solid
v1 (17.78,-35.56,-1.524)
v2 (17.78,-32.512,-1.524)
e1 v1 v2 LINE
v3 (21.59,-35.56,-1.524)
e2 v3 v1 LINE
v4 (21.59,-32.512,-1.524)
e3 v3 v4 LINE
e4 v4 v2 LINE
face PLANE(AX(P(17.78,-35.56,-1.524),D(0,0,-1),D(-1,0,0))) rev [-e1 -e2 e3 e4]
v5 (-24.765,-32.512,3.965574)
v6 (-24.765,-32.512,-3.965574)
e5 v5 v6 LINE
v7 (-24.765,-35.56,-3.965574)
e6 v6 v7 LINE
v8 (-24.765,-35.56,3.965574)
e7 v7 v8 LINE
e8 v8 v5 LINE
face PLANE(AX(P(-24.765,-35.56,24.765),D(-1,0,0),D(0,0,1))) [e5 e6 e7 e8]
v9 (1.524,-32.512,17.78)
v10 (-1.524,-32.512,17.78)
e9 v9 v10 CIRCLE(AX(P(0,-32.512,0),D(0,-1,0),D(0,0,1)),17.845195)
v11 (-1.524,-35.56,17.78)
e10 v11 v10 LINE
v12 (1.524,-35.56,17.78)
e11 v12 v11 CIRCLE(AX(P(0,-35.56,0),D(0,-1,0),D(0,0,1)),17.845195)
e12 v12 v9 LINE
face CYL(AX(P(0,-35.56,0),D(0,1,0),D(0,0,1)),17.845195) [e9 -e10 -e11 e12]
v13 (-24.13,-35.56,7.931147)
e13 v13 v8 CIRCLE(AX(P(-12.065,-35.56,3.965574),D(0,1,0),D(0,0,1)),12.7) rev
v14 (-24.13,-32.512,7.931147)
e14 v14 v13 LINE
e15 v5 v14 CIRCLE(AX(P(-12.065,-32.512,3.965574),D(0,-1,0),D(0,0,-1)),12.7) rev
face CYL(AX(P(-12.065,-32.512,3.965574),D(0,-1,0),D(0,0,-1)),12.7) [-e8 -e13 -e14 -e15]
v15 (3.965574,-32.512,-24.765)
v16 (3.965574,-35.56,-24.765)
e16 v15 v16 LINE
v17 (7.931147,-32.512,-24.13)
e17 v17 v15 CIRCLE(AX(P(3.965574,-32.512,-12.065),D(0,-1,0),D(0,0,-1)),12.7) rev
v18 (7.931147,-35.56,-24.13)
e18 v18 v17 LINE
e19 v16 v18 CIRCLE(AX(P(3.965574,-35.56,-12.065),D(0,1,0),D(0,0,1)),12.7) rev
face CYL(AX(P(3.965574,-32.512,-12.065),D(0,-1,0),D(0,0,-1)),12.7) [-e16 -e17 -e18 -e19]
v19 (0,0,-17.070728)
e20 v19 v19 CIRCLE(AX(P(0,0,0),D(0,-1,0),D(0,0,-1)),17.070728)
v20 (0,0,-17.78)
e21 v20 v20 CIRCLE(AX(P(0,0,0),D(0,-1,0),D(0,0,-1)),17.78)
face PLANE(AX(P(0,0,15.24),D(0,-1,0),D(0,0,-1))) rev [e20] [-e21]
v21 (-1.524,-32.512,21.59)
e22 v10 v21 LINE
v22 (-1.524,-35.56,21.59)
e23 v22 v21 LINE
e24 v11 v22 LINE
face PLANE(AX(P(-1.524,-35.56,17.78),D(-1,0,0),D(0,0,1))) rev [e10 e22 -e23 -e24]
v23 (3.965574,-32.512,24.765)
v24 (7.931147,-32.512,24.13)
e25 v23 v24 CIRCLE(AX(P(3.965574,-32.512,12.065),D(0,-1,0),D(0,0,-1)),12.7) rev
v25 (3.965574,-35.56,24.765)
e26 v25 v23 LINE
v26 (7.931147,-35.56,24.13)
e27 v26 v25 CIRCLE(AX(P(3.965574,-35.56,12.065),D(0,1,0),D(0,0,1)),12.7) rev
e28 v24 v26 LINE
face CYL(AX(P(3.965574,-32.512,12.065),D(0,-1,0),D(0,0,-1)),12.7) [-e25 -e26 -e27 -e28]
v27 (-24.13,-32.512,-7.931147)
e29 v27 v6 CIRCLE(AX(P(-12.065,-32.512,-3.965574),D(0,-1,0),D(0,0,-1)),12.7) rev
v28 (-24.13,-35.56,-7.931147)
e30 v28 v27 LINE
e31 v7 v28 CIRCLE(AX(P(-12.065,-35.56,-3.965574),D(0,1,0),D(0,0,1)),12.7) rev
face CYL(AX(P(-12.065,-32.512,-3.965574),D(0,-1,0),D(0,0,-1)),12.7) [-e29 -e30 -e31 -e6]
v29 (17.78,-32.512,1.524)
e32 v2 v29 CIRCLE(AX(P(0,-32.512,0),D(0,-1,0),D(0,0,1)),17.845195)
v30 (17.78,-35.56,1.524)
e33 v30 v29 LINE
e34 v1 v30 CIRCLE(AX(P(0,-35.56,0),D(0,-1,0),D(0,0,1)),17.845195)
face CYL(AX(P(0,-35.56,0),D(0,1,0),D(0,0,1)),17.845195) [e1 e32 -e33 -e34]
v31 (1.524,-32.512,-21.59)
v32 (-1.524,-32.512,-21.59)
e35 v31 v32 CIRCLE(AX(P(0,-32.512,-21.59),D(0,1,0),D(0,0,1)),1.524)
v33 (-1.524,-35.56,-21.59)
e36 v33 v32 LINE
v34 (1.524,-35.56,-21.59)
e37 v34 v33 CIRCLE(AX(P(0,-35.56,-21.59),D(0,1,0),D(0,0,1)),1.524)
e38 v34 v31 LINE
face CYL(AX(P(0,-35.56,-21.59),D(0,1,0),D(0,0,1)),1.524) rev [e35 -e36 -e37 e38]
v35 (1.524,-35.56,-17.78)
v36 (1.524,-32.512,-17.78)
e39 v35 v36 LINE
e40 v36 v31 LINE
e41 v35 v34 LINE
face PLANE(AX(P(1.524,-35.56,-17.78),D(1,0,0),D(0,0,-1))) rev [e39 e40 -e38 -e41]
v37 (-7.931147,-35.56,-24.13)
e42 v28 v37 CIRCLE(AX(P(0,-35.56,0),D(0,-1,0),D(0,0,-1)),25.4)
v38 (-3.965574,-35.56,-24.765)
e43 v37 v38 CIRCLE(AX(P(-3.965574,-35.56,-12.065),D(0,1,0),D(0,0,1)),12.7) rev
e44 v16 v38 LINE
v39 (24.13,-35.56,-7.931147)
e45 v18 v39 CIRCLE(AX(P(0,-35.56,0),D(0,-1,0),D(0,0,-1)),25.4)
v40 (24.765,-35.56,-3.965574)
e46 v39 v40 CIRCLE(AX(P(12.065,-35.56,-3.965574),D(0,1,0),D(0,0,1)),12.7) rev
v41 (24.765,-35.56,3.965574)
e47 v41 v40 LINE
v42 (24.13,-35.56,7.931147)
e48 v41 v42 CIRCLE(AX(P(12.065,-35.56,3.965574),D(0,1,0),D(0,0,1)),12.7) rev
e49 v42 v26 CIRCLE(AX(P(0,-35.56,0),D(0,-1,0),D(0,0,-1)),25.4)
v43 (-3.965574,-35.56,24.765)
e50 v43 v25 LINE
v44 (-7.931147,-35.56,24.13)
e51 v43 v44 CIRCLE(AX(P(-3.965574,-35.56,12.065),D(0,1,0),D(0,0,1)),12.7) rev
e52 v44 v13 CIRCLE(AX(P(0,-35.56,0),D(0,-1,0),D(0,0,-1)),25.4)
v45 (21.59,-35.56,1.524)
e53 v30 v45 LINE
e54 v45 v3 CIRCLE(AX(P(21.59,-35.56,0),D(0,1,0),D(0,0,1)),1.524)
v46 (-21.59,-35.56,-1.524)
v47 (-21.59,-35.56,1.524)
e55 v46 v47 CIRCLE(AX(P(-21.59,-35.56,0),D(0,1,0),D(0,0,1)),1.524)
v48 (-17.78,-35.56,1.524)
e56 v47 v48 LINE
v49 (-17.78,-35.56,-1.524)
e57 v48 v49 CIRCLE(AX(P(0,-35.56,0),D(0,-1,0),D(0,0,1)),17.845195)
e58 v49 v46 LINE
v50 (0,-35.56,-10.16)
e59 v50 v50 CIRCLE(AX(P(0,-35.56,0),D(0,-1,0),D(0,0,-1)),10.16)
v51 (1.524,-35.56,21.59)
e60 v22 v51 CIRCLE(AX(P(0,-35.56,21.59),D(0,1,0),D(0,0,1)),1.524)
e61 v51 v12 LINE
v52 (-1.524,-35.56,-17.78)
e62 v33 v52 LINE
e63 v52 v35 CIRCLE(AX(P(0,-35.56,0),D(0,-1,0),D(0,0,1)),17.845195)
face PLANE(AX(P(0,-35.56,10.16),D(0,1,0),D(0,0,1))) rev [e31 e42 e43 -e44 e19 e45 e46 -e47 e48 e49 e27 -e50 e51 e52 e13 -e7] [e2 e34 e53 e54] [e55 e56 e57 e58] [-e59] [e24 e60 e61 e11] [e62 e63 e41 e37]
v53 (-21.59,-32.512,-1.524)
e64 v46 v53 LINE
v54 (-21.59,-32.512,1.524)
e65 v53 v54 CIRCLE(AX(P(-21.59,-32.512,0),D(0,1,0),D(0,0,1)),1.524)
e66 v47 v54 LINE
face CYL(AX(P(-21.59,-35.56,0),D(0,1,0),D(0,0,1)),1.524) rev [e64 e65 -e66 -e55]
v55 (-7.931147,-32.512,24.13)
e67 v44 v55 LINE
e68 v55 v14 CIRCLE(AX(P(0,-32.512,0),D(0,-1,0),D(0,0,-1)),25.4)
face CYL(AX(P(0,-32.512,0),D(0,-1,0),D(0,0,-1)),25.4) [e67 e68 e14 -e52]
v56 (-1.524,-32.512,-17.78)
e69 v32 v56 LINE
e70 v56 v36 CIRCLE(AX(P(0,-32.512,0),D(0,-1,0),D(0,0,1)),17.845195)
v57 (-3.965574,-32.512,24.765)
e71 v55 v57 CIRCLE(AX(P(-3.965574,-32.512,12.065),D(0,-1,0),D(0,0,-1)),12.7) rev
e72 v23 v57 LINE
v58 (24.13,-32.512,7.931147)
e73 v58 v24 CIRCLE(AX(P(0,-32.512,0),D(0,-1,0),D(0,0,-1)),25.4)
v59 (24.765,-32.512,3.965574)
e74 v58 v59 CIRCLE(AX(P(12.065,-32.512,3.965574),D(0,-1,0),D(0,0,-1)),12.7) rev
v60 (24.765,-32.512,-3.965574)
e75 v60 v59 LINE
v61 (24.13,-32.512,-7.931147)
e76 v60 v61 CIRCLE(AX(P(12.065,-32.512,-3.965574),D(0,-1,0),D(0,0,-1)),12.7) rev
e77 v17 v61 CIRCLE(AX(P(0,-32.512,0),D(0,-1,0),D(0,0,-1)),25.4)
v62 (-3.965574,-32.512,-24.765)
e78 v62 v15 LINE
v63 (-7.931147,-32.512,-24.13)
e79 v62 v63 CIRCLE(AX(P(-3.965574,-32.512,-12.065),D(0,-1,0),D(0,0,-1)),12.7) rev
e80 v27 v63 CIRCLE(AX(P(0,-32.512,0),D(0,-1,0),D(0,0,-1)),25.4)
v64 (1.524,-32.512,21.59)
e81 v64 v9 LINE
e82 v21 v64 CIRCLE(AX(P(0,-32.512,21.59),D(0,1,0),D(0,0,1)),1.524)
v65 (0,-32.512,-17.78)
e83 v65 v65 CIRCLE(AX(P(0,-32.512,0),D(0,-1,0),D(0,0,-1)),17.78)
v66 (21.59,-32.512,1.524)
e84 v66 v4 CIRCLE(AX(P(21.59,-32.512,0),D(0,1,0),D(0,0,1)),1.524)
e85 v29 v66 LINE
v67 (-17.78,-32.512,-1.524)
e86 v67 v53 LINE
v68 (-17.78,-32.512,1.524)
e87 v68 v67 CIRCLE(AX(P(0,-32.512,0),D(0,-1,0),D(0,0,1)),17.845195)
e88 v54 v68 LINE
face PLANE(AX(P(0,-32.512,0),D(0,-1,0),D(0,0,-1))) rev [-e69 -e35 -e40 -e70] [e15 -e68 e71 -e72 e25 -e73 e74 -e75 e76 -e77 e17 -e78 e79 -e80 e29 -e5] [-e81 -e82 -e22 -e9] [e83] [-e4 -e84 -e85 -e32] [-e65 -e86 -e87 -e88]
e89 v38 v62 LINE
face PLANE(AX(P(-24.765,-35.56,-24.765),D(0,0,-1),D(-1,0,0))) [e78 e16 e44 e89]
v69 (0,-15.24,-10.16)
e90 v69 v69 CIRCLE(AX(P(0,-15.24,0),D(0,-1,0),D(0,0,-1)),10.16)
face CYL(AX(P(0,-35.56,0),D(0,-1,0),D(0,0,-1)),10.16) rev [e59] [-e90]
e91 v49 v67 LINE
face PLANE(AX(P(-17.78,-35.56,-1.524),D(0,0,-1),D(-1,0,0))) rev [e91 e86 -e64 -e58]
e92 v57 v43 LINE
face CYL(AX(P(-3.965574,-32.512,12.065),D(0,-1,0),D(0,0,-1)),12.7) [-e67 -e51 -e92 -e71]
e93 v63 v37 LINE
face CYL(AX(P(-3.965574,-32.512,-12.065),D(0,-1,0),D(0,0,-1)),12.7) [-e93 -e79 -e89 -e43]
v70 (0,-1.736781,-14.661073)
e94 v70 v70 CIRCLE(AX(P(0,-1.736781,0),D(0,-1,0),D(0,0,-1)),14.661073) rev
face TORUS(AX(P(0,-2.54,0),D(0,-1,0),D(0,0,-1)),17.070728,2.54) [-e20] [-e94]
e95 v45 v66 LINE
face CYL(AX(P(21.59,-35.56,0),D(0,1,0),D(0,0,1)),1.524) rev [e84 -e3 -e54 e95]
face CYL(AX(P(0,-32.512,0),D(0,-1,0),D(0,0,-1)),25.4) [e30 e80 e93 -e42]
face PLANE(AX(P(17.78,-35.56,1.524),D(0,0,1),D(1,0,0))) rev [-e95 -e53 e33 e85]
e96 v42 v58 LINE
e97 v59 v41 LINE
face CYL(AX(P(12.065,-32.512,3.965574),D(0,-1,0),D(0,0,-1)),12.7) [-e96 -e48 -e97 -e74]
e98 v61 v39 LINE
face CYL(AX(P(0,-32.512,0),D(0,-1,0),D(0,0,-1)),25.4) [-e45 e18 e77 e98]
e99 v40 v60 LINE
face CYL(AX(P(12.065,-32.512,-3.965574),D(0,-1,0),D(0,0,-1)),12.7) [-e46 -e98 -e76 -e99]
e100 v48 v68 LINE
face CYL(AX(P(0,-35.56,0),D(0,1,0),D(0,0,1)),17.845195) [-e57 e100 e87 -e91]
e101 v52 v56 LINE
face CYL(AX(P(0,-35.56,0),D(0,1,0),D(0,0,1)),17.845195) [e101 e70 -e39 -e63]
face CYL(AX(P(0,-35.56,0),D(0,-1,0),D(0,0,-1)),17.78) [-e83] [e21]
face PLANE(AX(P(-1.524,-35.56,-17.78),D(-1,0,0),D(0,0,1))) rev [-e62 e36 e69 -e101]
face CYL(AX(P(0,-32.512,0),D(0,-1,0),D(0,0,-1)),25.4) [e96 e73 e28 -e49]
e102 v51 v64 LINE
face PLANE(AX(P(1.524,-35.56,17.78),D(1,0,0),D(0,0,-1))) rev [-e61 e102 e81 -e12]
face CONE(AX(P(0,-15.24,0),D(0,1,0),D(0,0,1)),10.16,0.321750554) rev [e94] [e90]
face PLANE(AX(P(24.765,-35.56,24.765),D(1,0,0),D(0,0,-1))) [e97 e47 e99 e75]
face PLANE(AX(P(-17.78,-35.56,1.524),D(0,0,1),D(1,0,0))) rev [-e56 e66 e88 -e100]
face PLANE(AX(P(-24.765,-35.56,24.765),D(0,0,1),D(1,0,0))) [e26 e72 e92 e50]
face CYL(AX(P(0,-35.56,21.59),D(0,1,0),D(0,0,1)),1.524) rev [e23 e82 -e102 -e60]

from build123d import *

# Parameters (mm, degrees)
FILLET1_R           = 2.54
BOSS_EXTRUDE1_START = -3.048
SKETCH2_R           = 25.4
SKETCH2_R_2         = 17.78
BOSS_EXTRUDE1_DEPTH = 3.048
CUT_EXTRUDE1_START  = -3.048
CUT_EXTRUDE1_DEPTH  = 3.048
SKETCH5_OUTSIDE_W   = 68.832
SKETCH5_OUTSIDE_H   = 68.832
SKETCH5_OUTSIDE_W_2 = 49.53
SKETCH5_OUTSIDE_H_2 = 49.53
CUT_EXTRUDE2_DEPTH  = 49.449459687
FILLET2_R           = 12.7


# Read off the part's stored shape, not the designer's step: Cut-Extrude1
with BuildPart() as part:
    # Sketch1 → Revolve1 (revolve)
    with BuildSketch(Plane(origin=(0, 0, 0), x_dir=(0, 0, -1), z_dir=(1, 0, 0)), mode=Mode.PRIVATE) as revolve1_sk:
        Polygon((-15.24, 0), (-10.16, -15.24), (-10.16, -35.56), (-17.78, -35.56), (-17.78, 0), align=None)
    revolve(revolve1_sk.sketch.rotate(Axis((0, -35.56, 0), (0, 1, 0)), 180), axis=Axis((0, -35.56, 0), (0, 1, 0)))

    # Fillet1
    fillet1_edges = [part.edges().sort_by_distance(p)[0] for p in [
        (0, 0, 15.24),
    ]]
    fillet(fillet1_edges, radius=FILLET1_R)

    # Sketch2 → Boss-Extrude1 (add)
    with BuildSketch(Plane.XZ.offset(35.56).offset(BOSS_EXTRUDE1_START)):
        with Locations(Location((0, 0, 0), (0, 0, 270))):
            Circle(SKETCH2_R)
        with Locations(Location((0, 0, 0), (0, 0, 270))):
            Circle(SKETCH2_R_2, mode=Mode.SUBTRACT)
    extrude(amount=BOSS_EXTRUDE1_DEPTH)

    # Cut-Extrude1 outline → Cut-Extrude1 (cut)
    with BuildSketch(Plane(origin=(0, -32.512, 0), x_dir=(1, 0, 0), z_dir=(0, 1, 0)).offset(CUT_EXTRUDE1_START)):
        with BuildLine():
            ThreePointArc((-1.524, 17.78), (0, 17.845194759), (1.524, 17.78))
            Line((1.524, 17.78), (1.524, 21.59))
            ThreePointArc((1.524, 21.59), (0, 23.114), (-1.524, 21.59))
            Line((-1.524, 21.59), (-1.524, 17.78))
        make_face()
        with BuildLine():
            ThreePointArc((-17.78, -1.524), (-17.845194759, 0), (-17.78, 1.524))
            Line((-17.78, 1.524), (-21.59, 1.524))
            ThreePointArc((-21.59, 1.524), (-23.114, 0), (-21.59, -1.524))
            Line((-21.59, -1.524), (-17.78, -1.524))
        make_face()
        with BuildLine():
            ThreePointArc((1.524, -17.78), (0, -17.845194759), (-1.524, -17.78))
            Line((-1.524, -17.78), (-1.524, -21.59))
            ThreePointArc((-1.524, -21.59), (0, -23.114), (1.524, -21.59))
            Line((1.524, -21.59), (1.524, -17.78))
        make_face()
        with BuildLine():
            ThreePointArc((17.78, 1.524), (17.845194759, 0), (17.78, -1.524))
            Line((17.78, -1.524), (21.59, -1.524))
            ThreePointArc((21.59, -1.524), (23.114, 0), (21.59, 1.524))
            Line((21.59, 1.524), (17.78, 1.524))
        make_face()
    extrude(amount=CUT_EXTRUDE1_DEPTH, mode=Mode.SUBTRACT)

    # Sketch5 outside → Cut-Extrude2 (cut, through all)
    with BuildSketch(Plane(origin=(0, -32.512, 0), x_dir=(1, 0, 0), z_dir=(0, 1, 0))):
        Rectangle(SKETCH5_OUTSIDE_W, SKETCH5_OUTSIDE_H)
        Rectangle(SKETCH5_OUTSIDE_W_2, SKETCH5_OUTSIDE_H_2, mode=Mode.SUBTRACT)
    extrude(amount=-CUT_EXTRUDE2_DEPTH, mode=Mode.SUBTRACT)

    # Fillet2
    fillet2_edges = [part.edges().sort_by_distance(p)[0] for p in [
        (24.765, -34.036, 5.644003455),
        (24.765, -34.036, -5.644003455),
        (-5.644003455, -34.036, 24.765),
        (5.644003455, -34.036, 24.765),
        (-24.765, -34.036, -5.644003455),
        (-24.765, -34.036, 5.644003455),
        (5.644003455, -34.036, -24.765),
        (-5.644003455, -34.036, -24.765),
    ]]
    fillet(fillet2_edges, radius=FILLET2_R)


solid = part.part
